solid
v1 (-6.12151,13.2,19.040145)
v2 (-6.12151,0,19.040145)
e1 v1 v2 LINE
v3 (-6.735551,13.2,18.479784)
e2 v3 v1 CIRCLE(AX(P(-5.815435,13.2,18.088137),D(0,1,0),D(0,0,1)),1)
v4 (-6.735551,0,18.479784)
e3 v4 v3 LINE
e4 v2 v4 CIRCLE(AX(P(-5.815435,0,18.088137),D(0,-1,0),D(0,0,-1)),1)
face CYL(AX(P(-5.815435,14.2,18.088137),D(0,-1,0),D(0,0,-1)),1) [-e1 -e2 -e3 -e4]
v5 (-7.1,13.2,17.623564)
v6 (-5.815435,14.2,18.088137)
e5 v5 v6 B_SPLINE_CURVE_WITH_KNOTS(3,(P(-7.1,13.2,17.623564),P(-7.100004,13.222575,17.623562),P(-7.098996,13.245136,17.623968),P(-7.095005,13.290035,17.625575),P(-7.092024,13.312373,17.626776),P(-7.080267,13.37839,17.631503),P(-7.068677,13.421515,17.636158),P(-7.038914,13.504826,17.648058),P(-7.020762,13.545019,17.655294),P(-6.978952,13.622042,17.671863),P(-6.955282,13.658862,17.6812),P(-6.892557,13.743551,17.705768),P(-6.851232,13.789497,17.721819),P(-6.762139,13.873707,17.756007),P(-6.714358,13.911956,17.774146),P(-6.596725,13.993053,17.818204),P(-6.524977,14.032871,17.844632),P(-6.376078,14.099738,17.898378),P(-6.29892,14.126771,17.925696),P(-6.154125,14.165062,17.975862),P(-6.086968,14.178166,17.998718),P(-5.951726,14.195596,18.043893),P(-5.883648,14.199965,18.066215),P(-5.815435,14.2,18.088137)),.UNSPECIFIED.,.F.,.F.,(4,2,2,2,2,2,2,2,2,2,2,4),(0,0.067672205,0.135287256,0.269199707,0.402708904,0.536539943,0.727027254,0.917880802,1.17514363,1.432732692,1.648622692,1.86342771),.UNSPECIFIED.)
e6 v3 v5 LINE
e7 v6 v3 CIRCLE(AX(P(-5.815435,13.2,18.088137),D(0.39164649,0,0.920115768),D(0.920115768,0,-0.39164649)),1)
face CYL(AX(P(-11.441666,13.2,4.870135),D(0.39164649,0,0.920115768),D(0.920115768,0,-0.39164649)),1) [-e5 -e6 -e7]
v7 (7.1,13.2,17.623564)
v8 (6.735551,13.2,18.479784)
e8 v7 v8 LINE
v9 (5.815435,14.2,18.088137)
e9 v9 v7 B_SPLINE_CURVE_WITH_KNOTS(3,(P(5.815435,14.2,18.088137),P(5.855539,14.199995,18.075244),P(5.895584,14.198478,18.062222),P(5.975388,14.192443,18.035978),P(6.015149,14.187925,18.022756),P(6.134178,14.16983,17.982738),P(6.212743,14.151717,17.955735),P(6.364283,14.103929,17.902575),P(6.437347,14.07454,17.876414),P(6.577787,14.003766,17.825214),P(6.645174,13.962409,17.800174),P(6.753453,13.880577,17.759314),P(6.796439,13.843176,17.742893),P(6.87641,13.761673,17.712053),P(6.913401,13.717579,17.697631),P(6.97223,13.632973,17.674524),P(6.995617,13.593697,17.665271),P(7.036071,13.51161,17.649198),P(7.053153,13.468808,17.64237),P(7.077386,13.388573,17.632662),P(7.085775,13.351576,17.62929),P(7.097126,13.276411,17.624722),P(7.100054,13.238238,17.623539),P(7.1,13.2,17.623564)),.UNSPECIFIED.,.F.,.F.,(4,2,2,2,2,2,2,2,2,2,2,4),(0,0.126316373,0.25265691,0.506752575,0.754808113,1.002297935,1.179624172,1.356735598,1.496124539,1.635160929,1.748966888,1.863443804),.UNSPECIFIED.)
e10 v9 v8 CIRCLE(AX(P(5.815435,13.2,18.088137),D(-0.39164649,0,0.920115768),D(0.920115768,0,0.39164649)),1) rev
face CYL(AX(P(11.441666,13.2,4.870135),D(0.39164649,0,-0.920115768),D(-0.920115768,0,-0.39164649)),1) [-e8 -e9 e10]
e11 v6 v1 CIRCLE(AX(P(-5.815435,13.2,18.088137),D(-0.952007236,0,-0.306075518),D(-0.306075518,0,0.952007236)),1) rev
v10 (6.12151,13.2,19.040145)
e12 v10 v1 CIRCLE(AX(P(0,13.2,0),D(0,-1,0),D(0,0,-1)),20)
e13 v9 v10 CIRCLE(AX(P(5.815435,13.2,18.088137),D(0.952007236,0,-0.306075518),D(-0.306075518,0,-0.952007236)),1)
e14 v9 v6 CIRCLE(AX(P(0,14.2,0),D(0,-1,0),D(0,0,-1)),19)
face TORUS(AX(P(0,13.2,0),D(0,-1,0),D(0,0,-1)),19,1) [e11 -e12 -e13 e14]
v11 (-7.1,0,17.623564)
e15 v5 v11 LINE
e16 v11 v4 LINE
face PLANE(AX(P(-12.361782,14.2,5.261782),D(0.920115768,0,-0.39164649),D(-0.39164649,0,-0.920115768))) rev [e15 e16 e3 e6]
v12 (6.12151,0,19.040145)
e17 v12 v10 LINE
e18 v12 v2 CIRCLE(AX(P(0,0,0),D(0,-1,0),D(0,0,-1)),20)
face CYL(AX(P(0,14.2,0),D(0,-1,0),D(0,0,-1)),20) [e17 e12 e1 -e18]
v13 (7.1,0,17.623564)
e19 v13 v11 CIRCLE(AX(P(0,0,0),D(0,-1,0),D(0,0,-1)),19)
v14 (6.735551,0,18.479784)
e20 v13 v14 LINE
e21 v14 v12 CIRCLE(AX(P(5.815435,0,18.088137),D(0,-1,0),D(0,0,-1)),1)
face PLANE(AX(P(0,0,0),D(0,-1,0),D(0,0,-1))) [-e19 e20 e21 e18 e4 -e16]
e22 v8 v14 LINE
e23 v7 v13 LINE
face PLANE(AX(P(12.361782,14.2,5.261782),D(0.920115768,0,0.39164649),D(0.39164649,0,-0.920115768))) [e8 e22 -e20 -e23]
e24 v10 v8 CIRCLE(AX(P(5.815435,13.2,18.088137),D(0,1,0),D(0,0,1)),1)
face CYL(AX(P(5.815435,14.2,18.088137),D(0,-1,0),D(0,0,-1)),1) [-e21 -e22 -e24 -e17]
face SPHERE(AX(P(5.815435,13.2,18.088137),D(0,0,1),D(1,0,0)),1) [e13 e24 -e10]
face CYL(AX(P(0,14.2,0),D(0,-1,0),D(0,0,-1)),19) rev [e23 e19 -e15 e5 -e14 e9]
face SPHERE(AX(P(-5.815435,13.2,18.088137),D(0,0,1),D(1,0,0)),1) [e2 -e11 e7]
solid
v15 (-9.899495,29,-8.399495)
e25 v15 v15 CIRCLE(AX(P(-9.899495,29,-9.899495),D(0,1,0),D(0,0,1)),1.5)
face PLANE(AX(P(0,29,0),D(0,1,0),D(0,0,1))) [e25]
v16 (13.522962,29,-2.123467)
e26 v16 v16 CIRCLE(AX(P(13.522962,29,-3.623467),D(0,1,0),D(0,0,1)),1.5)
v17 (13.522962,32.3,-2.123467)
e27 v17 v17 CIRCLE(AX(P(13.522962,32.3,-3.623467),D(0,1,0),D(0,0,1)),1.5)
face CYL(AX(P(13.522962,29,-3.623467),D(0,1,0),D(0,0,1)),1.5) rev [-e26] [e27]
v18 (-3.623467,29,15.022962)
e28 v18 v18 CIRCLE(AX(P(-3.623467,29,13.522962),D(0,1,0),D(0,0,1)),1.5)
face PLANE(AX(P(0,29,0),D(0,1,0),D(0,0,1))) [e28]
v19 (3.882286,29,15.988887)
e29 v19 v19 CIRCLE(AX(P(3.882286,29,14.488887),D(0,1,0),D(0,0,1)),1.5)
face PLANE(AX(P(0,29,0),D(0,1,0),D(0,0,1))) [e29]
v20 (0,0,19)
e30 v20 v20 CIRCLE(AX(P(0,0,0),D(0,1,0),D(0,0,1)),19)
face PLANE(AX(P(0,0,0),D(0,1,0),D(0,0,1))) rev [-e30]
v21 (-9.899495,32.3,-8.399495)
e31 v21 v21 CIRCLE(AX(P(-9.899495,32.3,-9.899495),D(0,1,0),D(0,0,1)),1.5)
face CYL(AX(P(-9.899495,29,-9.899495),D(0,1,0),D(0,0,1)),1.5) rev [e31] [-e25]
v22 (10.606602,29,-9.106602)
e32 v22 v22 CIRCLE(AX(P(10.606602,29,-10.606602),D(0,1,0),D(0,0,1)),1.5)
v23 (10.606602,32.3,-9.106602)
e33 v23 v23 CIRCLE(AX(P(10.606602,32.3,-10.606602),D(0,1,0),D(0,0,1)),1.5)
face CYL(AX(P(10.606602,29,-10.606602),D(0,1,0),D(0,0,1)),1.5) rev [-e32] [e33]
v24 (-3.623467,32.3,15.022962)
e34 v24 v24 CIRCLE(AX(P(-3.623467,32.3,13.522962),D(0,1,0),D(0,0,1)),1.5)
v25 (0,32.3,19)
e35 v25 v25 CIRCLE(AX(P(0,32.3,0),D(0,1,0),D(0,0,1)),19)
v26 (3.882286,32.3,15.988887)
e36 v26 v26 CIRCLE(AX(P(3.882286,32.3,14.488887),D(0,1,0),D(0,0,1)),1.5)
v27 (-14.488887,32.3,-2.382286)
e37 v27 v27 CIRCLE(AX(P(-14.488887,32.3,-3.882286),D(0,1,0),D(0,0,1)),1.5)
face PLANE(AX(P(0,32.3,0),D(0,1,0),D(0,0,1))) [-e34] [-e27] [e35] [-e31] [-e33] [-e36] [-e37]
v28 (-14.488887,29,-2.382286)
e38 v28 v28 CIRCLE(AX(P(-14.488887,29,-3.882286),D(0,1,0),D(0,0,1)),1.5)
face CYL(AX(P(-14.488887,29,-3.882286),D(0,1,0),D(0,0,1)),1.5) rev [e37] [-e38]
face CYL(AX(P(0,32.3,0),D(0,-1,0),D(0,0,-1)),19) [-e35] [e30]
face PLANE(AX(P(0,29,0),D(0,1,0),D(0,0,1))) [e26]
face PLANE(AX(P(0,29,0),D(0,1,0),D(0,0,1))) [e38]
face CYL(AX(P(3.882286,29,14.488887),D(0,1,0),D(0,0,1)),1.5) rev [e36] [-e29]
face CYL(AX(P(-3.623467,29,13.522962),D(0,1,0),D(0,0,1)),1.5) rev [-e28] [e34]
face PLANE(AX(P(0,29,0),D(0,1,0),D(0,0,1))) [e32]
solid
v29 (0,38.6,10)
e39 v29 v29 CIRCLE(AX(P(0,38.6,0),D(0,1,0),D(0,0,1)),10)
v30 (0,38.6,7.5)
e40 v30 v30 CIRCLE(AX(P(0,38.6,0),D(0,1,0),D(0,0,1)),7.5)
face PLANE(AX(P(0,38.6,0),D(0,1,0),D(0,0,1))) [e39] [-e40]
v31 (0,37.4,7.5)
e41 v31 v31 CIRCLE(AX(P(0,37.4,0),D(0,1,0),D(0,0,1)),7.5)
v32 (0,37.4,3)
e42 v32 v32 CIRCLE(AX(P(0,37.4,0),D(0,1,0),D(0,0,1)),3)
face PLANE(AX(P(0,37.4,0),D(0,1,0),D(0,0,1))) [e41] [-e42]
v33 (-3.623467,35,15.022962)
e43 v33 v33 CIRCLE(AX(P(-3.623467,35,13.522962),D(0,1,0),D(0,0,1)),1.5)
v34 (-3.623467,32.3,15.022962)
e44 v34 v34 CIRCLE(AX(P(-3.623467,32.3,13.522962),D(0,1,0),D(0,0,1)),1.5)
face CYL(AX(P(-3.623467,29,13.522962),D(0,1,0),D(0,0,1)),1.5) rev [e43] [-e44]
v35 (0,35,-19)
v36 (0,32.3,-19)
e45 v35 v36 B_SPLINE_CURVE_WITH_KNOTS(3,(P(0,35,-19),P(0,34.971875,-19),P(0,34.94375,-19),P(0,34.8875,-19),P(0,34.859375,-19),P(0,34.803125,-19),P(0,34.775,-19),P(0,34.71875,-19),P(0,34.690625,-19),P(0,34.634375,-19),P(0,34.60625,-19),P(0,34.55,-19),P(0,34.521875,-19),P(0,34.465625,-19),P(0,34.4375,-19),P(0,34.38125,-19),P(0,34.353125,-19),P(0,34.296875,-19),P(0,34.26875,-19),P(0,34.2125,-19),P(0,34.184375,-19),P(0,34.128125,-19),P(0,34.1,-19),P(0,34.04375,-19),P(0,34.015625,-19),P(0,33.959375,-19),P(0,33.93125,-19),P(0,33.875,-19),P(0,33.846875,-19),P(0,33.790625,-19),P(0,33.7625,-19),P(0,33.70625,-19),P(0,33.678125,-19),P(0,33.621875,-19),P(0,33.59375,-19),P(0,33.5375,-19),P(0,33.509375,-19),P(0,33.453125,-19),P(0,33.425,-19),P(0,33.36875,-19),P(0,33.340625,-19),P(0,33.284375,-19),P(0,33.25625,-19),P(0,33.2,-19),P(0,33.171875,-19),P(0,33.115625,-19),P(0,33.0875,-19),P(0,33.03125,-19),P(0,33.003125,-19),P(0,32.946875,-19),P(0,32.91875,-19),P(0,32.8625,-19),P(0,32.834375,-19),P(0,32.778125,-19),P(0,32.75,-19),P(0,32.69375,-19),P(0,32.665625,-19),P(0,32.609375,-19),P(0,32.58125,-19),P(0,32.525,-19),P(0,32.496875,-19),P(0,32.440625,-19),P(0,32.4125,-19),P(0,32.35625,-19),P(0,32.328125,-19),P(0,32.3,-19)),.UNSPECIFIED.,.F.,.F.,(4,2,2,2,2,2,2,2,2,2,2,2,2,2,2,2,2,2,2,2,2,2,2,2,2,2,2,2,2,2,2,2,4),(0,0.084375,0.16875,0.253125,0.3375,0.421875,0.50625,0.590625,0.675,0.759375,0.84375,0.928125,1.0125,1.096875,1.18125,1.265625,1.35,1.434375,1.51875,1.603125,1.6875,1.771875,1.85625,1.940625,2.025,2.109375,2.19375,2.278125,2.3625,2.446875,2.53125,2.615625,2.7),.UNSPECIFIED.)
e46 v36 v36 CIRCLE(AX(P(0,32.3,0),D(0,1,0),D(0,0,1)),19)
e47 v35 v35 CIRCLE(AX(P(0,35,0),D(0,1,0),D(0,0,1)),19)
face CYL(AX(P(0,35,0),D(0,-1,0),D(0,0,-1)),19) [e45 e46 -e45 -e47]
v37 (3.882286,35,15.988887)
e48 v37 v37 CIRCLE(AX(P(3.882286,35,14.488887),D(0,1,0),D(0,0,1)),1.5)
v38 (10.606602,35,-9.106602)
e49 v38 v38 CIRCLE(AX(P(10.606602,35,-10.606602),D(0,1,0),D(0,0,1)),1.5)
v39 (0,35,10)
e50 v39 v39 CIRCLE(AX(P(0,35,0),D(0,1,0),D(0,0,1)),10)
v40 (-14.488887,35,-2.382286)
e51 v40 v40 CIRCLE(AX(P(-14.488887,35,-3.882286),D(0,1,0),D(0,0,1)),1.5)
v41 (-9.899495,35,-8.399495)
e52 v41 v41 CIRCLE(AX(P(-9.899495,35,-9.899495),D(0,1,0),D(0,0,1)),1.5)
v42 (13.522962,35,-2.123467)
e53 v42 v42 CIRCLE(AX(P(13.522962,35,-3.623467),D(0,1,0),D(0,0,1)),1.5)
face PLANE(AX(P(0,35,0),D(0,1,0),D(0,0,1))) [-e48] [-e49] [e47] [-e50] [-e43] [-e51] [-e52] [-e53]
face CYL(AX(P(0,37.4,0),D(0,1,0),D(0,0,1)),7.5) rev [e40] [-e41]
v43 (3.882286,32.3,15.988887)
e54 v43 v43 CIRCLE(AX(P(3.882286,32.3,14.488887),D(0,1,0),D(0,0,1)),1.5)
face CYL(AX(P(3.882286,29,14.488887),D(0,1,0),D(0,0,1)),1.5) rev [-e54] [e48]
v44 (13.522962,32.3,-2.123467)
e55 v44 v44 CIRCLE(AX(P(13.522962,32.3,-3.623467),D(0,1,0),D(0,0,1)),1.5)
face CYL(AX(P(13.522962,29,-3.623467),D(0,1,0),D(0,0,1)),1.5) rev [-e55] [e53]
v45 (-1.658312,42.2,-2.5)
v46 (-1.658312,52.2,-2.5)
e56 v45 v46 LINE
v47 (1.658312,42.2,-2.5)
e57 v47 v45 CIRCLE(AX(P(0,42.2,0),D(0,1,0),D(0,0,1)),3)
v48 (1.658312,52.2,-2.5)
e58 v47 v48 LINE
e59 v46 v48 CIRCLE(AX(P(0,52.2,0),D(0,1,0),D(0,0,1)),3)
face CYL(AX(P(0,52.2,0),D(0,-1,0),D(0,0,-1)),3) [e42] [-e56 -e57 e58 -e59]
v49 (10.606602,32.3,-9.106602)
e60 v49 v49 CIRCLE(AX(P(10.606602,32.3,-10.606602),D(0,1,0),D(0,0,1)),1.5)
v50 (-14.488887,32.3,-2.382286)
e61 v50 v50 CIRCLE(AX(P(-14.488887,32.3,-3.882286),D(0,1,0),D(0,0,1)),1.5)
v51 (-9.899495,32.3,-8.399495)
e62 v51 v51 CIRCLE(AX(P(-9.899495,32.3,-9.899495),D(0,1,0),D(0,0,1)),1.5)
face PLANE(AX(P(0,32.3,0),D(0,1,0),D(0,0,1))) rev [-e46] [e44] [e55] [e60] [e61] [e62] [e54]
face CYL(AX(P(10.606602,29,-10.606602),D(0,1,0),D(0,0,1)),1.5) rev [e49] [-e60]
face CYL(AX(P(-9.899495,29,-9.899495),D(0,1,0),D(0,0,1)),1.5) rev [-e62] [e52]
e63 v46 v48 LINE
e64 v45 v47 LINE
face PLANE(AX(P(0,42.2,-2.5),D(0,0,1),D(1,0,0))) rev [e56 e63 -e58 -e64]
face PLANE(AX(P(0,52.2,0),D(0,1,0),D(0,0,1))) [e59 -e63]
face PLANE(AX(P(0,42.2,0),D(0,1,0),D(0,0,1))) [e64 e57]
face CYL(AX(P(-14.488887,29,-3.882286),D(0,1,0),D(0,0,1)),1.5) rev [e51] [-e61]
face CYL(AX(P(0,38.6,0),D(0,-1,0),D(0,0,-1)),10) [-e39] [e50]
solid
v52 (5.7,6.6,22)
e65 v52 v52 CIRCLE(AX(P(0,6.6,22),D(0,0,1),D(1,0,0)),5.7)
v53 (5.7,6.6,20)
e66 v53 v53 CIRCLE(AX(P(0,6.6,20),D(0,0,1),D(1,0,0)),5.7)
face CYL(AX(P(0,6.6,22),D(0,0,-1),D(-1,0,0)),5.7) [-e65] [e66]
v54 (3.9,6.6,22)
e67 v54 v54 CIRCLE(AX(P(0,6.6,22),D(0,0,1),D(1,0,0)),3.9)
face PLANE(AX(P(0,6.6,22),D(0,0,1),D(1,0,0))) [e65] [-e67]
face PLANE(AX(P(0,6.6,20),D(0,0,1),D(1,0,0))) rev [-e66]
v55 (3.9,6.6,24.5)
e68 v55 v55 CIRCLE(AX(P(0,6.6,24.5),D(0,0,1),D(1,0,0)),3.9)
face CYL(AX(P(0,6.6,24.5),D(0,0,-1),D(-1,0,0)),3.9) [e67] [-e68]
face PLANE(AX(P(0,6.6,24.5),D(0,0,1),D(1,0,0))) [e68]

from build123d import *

# Parameters (mm, degrees)
SKETCH2_R               = 18.999999999999996
BOSS_EXTRUDE1_DEPTH     = 32.3
SKETCH3_R               = 18.999999999999996
BOSS_EXTRUDE2_DEPTH     = 2.7
SKETCH4_R               = 1.5000000000000024
SKETCH4_R_2             = 1.5000000000000022
SKETCH4_R_3             = 1.4999999999999998
SKETCH4_R_4             = 1.499999999999997
SKETCH4_R_5             = 1.5000000000000009
CUT_EXTRUDE1_DEPTH      = 6
SKETCH4_3_R             = 10
BOSS_EXTRUDE3_DEPTH     = 3.6
SKETCH5_R               = 7.5
CUT_EXTRUDE2_DEPTH      = 1.2
SKETCH6_R               = 3
BOSS_EXTRUDE4_DEPTH     = 14.8
CUT_EXTRUDE3_DEPTH      = 59.70979475351621
CUT_EXTRUDE3_DEPTH_BACK = 10
BOSS_EXTRUDE5_DEPTH     = 14.2
FILLET1_R               = 1
SKETCH9_R               = 5.7
BOSS_EXTRUDE6_DEPTH     = 2
SKETCH10_R              = 3.9000000000000004
BOSS_EXTRUDE7_DEPTH     = 2.5


with BuildPart() as part:
    # Sketch2 → Boss-Extrude1 (new body)
    with BuildSketch(Plane(origin=(0, 0, 0), x_dir=(1, 0, 0), z_dir=(0, 1, 0))):
        with Locations(Location((0, 0, 0), (0, 0, 270))):
            Circle(SKETCH2_R)
    extrude(amount=BOSS_EXTRUDE1_DEPTH)


with BuildPart() as body_2:
    # Sketch3 → Boss-Extrude2 (new body)
    with BuildSketch(Plane(origin=(0, 32.3, 0), x_dir=(1, 0, 0), z_dir=(0, 1, 0))):
        with Locations(Location((0, 0, 0), (0, 0, 90))):
            Circle(SKETCH3_R)
    extrude(amount=BOSS_EXTRUDE2_DEPTH)


with BuildPart() as cut_extrude1_tool:
    # Sketch4 → Cut-Extrude1 (new body)
    with BuildSketch(Plane(origin=(0, 34.99999999999999, 0), x_dir=(1, 0, 0), z_dir=(0, 1, 0))):
        with Locations(Location((-9.899494936611665, 9.899494936611667, 0), (0, 0, 270))):
            Circle(SKETCH4_R)
        with Locations(Location((-14.48888739433603, 3.8822856765377947, 0), (0, 0, 270))):
            Circle(SKETCH4_R_2)
        with Locations(Location((-3.6234666314352975, -13.522961568046956, 0), (0, 0, 270))):
            Circle(SKETCH4_R_3)
        with Locations(Location((3.882285676537826, -14.488887394336023, 0), (0, 0, 270))):
            Circle(SKETCH4_R_3)
        with Locations(Location((13.522961568046957, 3.623466631435291, 0), (0, 0, 270))):
            Circle(SKETCH4_R_4)
        with Locations(Location((10.606601717798199, 10.60660171779823, 0), (0, 0, 270))):
            Circle(SKETCH4_R_5)
    extrude(amount=-CUT_EXTRUDE1_DEPTH)


with BuildPart() as part_1:
    add(part.part)

    # Cut-Extrude1: cut by cut_extrude1_tool
    add(cut_extrude1_tool.part, mode=Mode.SUBTRACT)


with BuildPart() as body_2_1:
    add(body_2.part)

    # Cut-Extrude1: cut by cut_extrude1_tool
    add(cut_extrude1_tool.part, mode=Mode.SUBTRACT)

    # Sketch4<3> → Boss-Extrude3 (add)
    with BuildSketch(Plane(origin=(0, 34.99999999999999, 0), x_dir=(1, 0, 0), z_dir=(0, 1, 0))):
        with Locations(Location((0, 0, 0), (0, 0, 270))):
            Circle(SKETCH4_3_R)
    extrude(amount=BOSS_EXTRUDE3_DEPTH)

    # Sketch5 → Cut-Extrude2 (cut)
    with BuildSketch(Plane(origin=(0, 38.599999999999994, 0), x_dir=(1, 0, 0), z_dir=(0, 1, 0))):
        with Locations(Location((0, 0, 0), (0, 0, 270))):
            Circle(SKETCH5_R)
    extrude(amount=-CUT_EXTRUDE2_DEPTH, mode=Mode.SUBTRACT)

    # Sketch6 → Boss-Extrude4 (add)
    with BuildSketch(Plane(origin=(0, 37.4, 0), x_dir=(1, 0, 0), z_dir=(0, 1, 0))):
        with Locations(Location((0, 0, 0), (0, 0, 270))):
            Circle(SKETCH6_R)
    extrude(amount=BOSS_EXTRUDE4_DEPTH)

    # Sketch7 → Cut-Extrude3 (cut, two sides: drawn at the far end of the back side and taken through both)
    with BuildSketch(Plane(origin=(0, 52.199999999999996, 0), x_dir=(1, 0, 0), z_dir=(0, 1, 0)).offset(-CUT_EXTRUDE3_DEPTH_BACK)):
        Polygon((-71.29105075312172, 2.5), (-1.6583123951777008, 2.5), (1.6583123951777008, 2.5), (71.29105075312172, 2.5), (71.29105075312172, 141.76547671588804), (-71.29105075312172, 141.76547671588804), align=None)
    extrude(amount=CUT_EXTRUDE3_DEPTH + CUT_EXTRUDE3_DEPTH_BACK, mode=Mode.SUBTRACT)


with BuildPart() as body_3:
    # Sketch8 → Boss-Extrude5 (new body)
    with BuildSketch(Plane.XZ):
        with BuildLine():
            ThreePointArc((-7.1000000000000005, 17.623563771269417), (-3.616095155404414, 18.652717116470207), (3.5133e-13, 18.999999999999996))
            Line((0, 18.999999999999996), (0, 20))
            ThreePointArc((1.22e-15, 20), (-0.6540571990327249, 19.989302368526857), (-1.3074147117776902, 19.957220918039347))
            Line((-1.3074147117776898, 19.95722091803935), (-7.099999999999999, 17.623563771269414))
        make_face()
        with BuildLine():
            Line((-6.559330631564653, 18.893786853508686), (-7.099999999999999, 17.623563771269414))
            Line((-7.099999999999999, 17.623563771269414), (-1.3074147117776898, 19.95722091803935))
            ThreePointArc((-1.3074147117776902, 19.957220918039347), (-3.969148973854553, 19.602190092521532), (-6.559330631564651, 18.893786853508686))
        make_face()
        with BuildLine():
            Line((0, 20), (0, 18.999999999999996))
            ThreePointArc((3.5133e-13, 18.999999999999996), (3.6160951554047602, 18.65271711647014), (7.1, 17.623563771269417))
            Line((7.099999999999999, 17.623563771269414), (6.559330631564646, 18.893786853508686))
            ThreePointArc((6.559330631564646, 18.89378685350869), (3.325978271864252, 19.721507765256867), (1.22e-15, 20))
        make_face()
    extrude(amount=-BOSS_EXTRUDE5_DEPTH)

    # Fillet1
    fillet1_edges = [body_3.edges().sort_by_distance(p)[0] for p in [
        (-6.829665315782326, 14.2, 18.25867531238905),
        (6.829665315782322, 14.2, 18.25867531238905),
        (-3.77e-15, 14.2, 20.000000000000007),
        (6.559330631564646, 7.1, 18.893786853508686),
        (-6.559330631564653, 7.1, 18.893786853508686),
    ]]
    fillet(fillet1_edges, radius=FILLET1_R - 0.0001)  # a hair under: the kernel refuses the full size


with BuildPart() as body_4:
    # Sketch9 → Boss-Extrude6 (new body)
    with BuildSketch(Plane.XY.offset(20)):
        with Locations((0, 6.6)):
            Circle(SKETCH9_R)
    extrude(amount=BOSS_EXTRUDE6_DEPTH)

    # Sketch10 → Boss-Extrude7 (add)
    with BuildSketch(Plane.XY.offset(22)):
        with Locations((0, 6.6)):
            Circle(SKETCH10_R)
    extrude(amount=BOSS_EXTRUDE7_DEPTH)


solid = Compound([part_1.part, body_2_1.part, body_3.part, body_4.part])
